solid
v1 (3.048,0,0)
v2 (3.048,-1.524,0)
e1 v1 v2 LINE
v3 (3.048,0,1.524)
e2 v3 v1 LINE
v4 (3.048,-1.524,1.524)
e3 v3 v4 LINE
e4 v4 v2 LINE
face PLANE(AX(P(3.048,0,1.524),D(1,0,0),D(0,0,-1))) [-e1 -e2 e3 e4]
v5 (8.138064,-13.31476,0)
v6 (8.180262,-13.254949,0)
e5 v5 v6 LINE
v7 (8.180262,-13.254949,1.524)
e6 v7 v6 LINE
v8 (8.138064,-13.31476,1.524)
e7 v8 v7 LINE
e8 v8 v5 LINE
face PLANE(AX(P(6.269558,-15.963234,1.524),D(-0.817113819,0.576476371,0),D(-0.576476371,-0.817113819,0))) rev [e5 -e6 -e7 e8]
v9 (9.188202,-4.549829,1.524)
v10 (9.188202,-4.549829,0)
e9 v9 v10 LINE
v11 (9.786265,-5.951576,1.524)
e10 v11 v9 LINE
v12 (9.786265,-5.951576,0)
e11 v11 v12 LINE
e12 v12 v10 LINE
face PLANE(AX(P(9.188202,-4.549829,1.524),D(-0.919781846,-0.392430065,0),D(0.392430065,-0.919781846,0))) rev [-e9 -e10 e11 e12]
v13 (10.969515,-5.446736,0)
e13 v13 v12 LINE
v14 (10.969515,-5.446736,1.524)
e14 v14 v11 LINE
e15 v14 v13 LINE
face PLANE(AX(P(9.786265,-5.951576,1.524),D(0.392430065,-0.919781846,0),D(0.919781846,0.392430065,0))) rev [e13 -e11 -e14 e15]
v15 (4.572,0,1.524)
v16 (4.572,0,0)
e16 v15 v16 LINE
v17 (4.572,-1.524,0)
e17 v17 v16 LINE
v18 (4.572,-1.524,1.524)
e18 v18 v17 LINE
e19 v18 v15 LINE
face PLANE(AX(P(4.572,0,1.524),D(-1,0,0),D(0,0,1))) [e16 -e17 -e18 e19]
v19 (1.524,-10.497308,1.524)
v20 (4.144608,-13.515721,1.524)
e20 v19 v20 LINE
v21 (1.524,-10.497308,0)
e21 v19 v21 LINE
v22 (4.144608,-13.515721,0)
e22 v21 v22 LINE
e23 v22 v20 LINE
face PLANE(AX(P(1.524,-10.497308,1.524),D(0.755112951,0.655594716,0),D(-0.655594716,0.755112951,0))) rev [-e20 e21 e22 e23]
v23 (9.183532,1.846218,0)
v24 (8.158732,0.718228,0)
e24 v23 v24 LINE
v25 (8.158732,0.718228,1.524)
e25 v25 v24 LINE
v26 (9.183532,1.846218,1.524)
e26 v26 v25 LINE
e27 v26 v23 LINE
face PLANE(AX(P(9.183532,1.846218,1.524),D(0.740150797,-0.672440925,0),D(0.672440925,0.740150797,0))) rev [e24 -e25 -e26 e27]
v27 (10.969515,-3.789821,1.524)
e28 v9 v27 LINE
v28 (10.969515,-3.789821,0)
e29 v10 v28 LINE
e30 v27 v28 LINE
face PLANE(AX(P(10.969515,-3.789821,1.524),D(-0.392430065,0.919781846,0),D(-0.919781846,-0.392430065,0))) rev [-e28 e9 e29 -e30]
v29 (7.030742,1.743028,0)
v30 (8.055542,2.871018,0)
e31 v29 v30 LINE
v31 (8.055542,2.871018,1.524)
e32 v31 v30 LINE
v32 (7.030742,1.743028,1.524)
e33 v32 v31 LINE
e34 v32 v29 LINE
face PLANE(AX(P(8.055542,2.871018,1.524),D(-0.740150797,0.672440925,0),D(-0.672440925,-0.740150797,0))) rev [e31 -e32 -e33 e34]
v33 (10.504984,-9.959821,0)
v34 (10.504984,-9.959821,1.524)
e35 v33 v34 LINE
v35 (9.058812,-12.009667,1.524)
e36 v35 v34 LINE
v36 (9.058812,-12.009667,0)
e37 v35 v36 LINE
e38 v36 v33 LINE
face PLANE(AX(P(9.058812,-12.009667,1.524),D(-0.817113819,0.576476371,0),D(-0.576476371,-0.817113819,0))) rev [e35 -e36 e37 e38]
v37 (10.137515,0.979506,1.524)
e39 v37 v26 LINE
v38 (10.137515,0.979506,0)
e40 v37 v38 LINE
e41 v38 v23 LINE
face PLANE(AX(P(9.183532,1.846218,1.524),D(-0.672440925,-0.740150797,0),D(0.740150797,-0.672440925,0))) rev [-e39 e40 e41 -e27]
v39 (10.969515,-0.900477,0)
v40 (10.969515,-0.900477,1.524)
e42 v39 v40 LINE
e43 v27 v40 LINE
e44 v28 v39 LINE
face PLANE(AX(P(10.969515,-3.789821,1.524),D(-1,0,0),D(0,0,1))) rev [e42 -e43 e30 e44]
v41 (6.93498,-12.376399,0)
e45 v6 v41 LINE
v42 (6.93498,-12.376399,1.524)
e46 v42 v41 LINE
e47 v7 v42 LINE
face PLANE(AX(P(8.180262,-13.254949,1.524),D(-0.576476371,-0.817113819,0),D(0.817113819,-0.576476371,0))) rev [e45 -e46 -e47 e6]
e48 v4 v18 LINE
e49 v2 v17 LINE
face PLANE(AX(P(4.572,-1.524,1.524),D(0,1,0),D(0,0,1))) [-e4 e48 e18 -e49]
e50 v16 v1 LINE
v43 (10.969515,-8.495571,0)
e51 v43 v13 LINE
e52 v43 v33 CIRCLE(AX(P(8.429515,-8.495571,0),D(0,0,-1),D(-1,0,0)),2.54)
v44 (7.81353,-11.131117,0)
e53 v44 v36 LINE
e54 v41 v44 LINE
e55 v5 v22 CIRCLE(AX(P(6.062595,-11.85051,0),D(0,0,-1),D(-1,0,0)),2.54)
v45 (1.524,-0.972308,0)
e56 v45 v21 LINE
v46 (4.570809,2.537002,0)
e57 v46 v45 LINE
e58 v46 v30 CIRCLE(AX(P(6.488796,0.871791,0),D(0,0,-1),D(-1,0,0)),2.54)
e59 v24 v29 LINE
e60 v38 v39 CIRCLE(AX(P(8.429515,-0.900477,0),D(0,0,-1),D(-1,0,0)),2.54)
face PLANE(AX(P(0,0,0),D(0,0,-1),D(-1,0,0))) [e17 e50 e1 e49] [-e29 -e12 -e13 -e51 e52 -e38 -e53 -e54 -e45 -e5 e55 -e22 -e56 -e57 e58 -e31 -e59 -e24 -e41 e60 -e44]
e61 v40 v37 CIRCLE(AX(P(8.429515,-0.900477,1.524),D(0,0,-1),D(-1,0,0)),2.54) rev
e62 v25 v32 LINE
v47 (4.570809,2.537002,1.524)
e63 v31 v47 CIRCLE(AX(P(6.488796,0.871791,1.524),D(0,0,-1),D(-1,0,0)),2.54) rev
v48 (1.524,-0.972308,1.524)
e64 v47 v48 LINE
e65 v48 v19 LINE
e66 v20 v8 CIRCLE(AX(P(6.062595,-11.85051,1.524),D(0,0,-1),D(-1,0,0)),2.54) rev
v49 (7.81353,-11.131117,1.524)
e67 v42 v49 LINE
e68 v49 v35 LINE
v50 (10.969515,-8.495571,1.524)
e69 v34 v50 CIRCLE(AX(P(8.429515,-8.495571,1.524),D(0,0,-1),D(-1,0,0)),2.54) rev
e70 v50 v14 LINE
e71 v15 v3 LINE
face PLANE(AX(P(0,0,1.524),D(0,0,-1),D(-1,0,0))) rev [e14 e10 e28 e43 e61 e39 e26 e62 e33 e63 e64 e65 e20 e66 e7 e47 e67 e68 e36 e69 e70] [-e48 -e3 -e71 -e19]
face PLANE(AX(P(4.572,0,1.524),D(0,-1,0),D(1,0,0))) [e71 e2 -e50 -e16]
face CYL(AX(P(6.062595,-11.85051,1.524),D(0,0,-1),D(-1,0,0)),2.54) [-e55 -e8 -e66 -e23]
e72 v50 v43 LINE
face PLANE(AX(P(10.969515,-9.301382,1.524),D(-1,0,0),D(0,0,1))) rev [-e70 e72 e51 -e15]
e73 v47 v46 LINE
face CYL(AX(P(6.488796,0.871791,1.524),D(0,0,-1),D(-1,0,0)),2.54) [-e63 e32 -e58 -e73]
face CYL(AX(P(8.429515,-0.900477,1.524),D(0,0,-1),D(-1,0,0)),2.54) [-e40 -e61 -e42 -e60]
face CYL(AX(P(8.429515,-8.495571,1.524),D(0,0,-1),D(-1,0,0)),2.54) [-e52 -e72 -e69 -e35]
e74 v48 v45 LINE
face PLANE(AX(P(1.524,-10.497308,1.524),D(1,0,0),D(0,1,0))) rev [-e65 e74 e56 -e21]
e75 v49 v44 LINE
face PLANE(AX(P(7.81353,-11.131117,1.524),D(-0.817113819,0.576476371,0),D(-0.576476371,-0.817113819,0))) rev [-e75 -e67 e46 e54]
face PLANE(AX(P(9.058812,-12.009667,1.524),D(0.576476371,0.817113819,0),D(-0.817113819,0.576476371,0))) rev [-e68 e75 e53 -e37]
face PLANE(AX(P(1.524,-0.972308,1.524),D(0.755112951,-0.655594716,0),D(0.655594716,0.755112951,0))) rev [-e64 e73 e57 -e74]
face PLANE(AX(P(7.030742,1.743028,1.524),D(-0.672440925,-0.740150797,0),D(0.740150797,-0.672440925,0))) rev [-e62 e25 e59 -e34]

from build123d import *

# Parameters (mm, degrees)
SKETCH1_W           = 1.524
SKETCH1_H           = 1.524
BOSS_EXTRUDE1_DEPTH = 1.524
FILLET1_R           = 2.54


with BuildPart() as part:
    # Sketch1 → Boss-Extrude1 (new body)
    with BuildSketch(Plane.XY):
        Polygon((1.524, -10.497308023), (1.524, -0.972308023), (6.269557814, 4.493617922), (8.055541686, 2.871017969), (7.030741716, 1.743028155), (8.158731531, 0.718228185), (9.183531501, 1.846217999), (10.969515373, 0.223618046), (10.969515373, -3.789821466), (9.188202018, -4.549828763), (9.786265437, -5.951576297), (10.969515373, -5.446736099), (10.969515373, -9.301381954), (9.058811588, -12.009667231), (7.813530127, -11.131117242), (6.934980138, -12.376398702), (8.180261599, -13.254948692), (6.269557814, -15.963233969), align=None)
        with Locations((3.81, -0.762)):
            Rectangle(SKETCH1_W, SKETCH1_H, mode=Mode.SUBTRACT)
    extrude(amount=BOSS_EXTRUDE1_DEPTH)

    # Fillet1
    # the kernel refuses this fillet: 2.54 mm, written as the material it takes off along each edge
    with BuildSketch(Plane(origin=(6.269557814, 4.493617922, -6.477892314), x_dir=(-0.6555947155448552, -0.7551129511203344, 0), z_dir=(0, 0, 1))) as fillet1_piece_1:
        with BuildLine():
            CenterArc((2.591156926, 2.54), FILLET1_R, 182.87981761, 87.12018239)
            Line((0.05436465, 2.412387507), (0.003628804, 2.409835257))
            ThreePointArc((0.003628804, 2.409835257), (-0.023604781, 1.207338273), (-0.050787105, 0.001144519))
            Line((-0.050787105, 0.001144519), (0, -0.0508))
            Line((0, -0.0508), (2.591156926, -0.0508))
            Line((2.591156926, -0.0508), (2.591156926, 0))
        make_face()
    extrude(amount=14.479784629, mode=Mode.SUBTRACT)
    with BuildSketch(Plane(origin=(10.969515373, 0.223618046, -2.81023831), x_dir=(-0.7401507968211615, 0.6724409252603532, 0), z_dir=(0, 0, 1))) as fillet1_piece_2:
        with BuildLine():
            CenterArc((FILLET1_R * 0.442557214214, FILLET1_R), FILLET1_R, 222.255737271, 47.744262729)
            Line((-FILLET1_R * 0.297593582607, FILLET1_R * 0.32755907474), (-FILLET1_R * 0.312396598543, FILLET1_R * 0.314110256234))
            Line((-FILLET1_R * 0.312396598543, FILLET1_R * 0.314110256234), (-FILLET1_R * 0.00885114428429, -FILLET1_R * 0.02))
            Line((-FILLET1_R * 0.00885114428429, -FILLET1_R * 0.02), (FILLET1_R * 0.442557214214, -FILLET1_R * 0.02))
            Line((FILLET1_R * 0.442557214214, -FILLET1_R * 0.02), (FILLET1_R * 0.442557214214, 0))
        make_face()
    extrude(amount=7.144476621, mode=Mode.SUBTRACT)
    with BuildSketch(Plane(origin=(10.969515373, -9.301381954, -2.014527057), x_dir=(0, 1, 0), z_dir=(0, 0, 1))) as fillet1_piece_3:
        with BuildLine():
            CenterArc((FILLET1_R * 0.317248355422, FILLET1_R), FILLET1_R, 234.796910959, 35.203089041)
            Line((-FILLET1_R * 0.259228015403, FILLET1_R * 0.182886180584), (-FILLET1_R * 0.270757542819, FILLET1_R * 0.166543904196))
            Line((-FILLET1_R * 0.270757542819, FILLET1_R * 0.166543904196), (-FILLET1_R * 0.00634496710845, -FILLET1_R * 0.02))
            Line((-FILLET1_R * 0.00634496710845, -FILLET1_R * 0.02), (FILLET1_R * 0.317248355422, -FILLET1_R * 0.02))
            Line((FILLET1_R * 0.317248355422, -FILLET1_R * 0.02), (FILLET1_R * 0.317248355422, 0))
        make_face()
    extrude(amount=5.553054114, mode=Mode.SUBTRACT)
    with BuildSketch(Plane(origin=(6.269557814, -15.963233969, -8.10313634), x_dir=(0.5764763708249786, 0.8171138194159133, 0), z_dir=(0, 0, 1))) as fillet1_piece_4:
        with BuildLine():
            CenterArc((FILLET1_R * 1.27608446293, FILLET1_R), FILLET1_R, 166.167848872, 103.832151128)
            Line((FILLET1_R * 0.305084187293, FILLET1_R * 1.23907836523), (FILLET1_R * 0.28566418178, FILLET1_R * 1.24385993254))
            Line((FILLET1_R * 0.28566418178, FILLET1_R * 1.24385993254), (-FILLET1_R * 0.0255216892585, -FILLET1_R * 0.02))
            Line((-FILLET1_R * 0.0255216892585, -FILLET1_R * 0.02), (FILLET1_R * 1.27608446293, -FILLET1_R * 0.02))
            Line((FILLET1_R * 1.27608446293, -FILLET1_R * 0.02), (FILLET1_R * 1.27608446293, 0))
        make_face()
    extrude(amount=17.730272679, mode=Mode.SUBTRACT)


solid = part.part
